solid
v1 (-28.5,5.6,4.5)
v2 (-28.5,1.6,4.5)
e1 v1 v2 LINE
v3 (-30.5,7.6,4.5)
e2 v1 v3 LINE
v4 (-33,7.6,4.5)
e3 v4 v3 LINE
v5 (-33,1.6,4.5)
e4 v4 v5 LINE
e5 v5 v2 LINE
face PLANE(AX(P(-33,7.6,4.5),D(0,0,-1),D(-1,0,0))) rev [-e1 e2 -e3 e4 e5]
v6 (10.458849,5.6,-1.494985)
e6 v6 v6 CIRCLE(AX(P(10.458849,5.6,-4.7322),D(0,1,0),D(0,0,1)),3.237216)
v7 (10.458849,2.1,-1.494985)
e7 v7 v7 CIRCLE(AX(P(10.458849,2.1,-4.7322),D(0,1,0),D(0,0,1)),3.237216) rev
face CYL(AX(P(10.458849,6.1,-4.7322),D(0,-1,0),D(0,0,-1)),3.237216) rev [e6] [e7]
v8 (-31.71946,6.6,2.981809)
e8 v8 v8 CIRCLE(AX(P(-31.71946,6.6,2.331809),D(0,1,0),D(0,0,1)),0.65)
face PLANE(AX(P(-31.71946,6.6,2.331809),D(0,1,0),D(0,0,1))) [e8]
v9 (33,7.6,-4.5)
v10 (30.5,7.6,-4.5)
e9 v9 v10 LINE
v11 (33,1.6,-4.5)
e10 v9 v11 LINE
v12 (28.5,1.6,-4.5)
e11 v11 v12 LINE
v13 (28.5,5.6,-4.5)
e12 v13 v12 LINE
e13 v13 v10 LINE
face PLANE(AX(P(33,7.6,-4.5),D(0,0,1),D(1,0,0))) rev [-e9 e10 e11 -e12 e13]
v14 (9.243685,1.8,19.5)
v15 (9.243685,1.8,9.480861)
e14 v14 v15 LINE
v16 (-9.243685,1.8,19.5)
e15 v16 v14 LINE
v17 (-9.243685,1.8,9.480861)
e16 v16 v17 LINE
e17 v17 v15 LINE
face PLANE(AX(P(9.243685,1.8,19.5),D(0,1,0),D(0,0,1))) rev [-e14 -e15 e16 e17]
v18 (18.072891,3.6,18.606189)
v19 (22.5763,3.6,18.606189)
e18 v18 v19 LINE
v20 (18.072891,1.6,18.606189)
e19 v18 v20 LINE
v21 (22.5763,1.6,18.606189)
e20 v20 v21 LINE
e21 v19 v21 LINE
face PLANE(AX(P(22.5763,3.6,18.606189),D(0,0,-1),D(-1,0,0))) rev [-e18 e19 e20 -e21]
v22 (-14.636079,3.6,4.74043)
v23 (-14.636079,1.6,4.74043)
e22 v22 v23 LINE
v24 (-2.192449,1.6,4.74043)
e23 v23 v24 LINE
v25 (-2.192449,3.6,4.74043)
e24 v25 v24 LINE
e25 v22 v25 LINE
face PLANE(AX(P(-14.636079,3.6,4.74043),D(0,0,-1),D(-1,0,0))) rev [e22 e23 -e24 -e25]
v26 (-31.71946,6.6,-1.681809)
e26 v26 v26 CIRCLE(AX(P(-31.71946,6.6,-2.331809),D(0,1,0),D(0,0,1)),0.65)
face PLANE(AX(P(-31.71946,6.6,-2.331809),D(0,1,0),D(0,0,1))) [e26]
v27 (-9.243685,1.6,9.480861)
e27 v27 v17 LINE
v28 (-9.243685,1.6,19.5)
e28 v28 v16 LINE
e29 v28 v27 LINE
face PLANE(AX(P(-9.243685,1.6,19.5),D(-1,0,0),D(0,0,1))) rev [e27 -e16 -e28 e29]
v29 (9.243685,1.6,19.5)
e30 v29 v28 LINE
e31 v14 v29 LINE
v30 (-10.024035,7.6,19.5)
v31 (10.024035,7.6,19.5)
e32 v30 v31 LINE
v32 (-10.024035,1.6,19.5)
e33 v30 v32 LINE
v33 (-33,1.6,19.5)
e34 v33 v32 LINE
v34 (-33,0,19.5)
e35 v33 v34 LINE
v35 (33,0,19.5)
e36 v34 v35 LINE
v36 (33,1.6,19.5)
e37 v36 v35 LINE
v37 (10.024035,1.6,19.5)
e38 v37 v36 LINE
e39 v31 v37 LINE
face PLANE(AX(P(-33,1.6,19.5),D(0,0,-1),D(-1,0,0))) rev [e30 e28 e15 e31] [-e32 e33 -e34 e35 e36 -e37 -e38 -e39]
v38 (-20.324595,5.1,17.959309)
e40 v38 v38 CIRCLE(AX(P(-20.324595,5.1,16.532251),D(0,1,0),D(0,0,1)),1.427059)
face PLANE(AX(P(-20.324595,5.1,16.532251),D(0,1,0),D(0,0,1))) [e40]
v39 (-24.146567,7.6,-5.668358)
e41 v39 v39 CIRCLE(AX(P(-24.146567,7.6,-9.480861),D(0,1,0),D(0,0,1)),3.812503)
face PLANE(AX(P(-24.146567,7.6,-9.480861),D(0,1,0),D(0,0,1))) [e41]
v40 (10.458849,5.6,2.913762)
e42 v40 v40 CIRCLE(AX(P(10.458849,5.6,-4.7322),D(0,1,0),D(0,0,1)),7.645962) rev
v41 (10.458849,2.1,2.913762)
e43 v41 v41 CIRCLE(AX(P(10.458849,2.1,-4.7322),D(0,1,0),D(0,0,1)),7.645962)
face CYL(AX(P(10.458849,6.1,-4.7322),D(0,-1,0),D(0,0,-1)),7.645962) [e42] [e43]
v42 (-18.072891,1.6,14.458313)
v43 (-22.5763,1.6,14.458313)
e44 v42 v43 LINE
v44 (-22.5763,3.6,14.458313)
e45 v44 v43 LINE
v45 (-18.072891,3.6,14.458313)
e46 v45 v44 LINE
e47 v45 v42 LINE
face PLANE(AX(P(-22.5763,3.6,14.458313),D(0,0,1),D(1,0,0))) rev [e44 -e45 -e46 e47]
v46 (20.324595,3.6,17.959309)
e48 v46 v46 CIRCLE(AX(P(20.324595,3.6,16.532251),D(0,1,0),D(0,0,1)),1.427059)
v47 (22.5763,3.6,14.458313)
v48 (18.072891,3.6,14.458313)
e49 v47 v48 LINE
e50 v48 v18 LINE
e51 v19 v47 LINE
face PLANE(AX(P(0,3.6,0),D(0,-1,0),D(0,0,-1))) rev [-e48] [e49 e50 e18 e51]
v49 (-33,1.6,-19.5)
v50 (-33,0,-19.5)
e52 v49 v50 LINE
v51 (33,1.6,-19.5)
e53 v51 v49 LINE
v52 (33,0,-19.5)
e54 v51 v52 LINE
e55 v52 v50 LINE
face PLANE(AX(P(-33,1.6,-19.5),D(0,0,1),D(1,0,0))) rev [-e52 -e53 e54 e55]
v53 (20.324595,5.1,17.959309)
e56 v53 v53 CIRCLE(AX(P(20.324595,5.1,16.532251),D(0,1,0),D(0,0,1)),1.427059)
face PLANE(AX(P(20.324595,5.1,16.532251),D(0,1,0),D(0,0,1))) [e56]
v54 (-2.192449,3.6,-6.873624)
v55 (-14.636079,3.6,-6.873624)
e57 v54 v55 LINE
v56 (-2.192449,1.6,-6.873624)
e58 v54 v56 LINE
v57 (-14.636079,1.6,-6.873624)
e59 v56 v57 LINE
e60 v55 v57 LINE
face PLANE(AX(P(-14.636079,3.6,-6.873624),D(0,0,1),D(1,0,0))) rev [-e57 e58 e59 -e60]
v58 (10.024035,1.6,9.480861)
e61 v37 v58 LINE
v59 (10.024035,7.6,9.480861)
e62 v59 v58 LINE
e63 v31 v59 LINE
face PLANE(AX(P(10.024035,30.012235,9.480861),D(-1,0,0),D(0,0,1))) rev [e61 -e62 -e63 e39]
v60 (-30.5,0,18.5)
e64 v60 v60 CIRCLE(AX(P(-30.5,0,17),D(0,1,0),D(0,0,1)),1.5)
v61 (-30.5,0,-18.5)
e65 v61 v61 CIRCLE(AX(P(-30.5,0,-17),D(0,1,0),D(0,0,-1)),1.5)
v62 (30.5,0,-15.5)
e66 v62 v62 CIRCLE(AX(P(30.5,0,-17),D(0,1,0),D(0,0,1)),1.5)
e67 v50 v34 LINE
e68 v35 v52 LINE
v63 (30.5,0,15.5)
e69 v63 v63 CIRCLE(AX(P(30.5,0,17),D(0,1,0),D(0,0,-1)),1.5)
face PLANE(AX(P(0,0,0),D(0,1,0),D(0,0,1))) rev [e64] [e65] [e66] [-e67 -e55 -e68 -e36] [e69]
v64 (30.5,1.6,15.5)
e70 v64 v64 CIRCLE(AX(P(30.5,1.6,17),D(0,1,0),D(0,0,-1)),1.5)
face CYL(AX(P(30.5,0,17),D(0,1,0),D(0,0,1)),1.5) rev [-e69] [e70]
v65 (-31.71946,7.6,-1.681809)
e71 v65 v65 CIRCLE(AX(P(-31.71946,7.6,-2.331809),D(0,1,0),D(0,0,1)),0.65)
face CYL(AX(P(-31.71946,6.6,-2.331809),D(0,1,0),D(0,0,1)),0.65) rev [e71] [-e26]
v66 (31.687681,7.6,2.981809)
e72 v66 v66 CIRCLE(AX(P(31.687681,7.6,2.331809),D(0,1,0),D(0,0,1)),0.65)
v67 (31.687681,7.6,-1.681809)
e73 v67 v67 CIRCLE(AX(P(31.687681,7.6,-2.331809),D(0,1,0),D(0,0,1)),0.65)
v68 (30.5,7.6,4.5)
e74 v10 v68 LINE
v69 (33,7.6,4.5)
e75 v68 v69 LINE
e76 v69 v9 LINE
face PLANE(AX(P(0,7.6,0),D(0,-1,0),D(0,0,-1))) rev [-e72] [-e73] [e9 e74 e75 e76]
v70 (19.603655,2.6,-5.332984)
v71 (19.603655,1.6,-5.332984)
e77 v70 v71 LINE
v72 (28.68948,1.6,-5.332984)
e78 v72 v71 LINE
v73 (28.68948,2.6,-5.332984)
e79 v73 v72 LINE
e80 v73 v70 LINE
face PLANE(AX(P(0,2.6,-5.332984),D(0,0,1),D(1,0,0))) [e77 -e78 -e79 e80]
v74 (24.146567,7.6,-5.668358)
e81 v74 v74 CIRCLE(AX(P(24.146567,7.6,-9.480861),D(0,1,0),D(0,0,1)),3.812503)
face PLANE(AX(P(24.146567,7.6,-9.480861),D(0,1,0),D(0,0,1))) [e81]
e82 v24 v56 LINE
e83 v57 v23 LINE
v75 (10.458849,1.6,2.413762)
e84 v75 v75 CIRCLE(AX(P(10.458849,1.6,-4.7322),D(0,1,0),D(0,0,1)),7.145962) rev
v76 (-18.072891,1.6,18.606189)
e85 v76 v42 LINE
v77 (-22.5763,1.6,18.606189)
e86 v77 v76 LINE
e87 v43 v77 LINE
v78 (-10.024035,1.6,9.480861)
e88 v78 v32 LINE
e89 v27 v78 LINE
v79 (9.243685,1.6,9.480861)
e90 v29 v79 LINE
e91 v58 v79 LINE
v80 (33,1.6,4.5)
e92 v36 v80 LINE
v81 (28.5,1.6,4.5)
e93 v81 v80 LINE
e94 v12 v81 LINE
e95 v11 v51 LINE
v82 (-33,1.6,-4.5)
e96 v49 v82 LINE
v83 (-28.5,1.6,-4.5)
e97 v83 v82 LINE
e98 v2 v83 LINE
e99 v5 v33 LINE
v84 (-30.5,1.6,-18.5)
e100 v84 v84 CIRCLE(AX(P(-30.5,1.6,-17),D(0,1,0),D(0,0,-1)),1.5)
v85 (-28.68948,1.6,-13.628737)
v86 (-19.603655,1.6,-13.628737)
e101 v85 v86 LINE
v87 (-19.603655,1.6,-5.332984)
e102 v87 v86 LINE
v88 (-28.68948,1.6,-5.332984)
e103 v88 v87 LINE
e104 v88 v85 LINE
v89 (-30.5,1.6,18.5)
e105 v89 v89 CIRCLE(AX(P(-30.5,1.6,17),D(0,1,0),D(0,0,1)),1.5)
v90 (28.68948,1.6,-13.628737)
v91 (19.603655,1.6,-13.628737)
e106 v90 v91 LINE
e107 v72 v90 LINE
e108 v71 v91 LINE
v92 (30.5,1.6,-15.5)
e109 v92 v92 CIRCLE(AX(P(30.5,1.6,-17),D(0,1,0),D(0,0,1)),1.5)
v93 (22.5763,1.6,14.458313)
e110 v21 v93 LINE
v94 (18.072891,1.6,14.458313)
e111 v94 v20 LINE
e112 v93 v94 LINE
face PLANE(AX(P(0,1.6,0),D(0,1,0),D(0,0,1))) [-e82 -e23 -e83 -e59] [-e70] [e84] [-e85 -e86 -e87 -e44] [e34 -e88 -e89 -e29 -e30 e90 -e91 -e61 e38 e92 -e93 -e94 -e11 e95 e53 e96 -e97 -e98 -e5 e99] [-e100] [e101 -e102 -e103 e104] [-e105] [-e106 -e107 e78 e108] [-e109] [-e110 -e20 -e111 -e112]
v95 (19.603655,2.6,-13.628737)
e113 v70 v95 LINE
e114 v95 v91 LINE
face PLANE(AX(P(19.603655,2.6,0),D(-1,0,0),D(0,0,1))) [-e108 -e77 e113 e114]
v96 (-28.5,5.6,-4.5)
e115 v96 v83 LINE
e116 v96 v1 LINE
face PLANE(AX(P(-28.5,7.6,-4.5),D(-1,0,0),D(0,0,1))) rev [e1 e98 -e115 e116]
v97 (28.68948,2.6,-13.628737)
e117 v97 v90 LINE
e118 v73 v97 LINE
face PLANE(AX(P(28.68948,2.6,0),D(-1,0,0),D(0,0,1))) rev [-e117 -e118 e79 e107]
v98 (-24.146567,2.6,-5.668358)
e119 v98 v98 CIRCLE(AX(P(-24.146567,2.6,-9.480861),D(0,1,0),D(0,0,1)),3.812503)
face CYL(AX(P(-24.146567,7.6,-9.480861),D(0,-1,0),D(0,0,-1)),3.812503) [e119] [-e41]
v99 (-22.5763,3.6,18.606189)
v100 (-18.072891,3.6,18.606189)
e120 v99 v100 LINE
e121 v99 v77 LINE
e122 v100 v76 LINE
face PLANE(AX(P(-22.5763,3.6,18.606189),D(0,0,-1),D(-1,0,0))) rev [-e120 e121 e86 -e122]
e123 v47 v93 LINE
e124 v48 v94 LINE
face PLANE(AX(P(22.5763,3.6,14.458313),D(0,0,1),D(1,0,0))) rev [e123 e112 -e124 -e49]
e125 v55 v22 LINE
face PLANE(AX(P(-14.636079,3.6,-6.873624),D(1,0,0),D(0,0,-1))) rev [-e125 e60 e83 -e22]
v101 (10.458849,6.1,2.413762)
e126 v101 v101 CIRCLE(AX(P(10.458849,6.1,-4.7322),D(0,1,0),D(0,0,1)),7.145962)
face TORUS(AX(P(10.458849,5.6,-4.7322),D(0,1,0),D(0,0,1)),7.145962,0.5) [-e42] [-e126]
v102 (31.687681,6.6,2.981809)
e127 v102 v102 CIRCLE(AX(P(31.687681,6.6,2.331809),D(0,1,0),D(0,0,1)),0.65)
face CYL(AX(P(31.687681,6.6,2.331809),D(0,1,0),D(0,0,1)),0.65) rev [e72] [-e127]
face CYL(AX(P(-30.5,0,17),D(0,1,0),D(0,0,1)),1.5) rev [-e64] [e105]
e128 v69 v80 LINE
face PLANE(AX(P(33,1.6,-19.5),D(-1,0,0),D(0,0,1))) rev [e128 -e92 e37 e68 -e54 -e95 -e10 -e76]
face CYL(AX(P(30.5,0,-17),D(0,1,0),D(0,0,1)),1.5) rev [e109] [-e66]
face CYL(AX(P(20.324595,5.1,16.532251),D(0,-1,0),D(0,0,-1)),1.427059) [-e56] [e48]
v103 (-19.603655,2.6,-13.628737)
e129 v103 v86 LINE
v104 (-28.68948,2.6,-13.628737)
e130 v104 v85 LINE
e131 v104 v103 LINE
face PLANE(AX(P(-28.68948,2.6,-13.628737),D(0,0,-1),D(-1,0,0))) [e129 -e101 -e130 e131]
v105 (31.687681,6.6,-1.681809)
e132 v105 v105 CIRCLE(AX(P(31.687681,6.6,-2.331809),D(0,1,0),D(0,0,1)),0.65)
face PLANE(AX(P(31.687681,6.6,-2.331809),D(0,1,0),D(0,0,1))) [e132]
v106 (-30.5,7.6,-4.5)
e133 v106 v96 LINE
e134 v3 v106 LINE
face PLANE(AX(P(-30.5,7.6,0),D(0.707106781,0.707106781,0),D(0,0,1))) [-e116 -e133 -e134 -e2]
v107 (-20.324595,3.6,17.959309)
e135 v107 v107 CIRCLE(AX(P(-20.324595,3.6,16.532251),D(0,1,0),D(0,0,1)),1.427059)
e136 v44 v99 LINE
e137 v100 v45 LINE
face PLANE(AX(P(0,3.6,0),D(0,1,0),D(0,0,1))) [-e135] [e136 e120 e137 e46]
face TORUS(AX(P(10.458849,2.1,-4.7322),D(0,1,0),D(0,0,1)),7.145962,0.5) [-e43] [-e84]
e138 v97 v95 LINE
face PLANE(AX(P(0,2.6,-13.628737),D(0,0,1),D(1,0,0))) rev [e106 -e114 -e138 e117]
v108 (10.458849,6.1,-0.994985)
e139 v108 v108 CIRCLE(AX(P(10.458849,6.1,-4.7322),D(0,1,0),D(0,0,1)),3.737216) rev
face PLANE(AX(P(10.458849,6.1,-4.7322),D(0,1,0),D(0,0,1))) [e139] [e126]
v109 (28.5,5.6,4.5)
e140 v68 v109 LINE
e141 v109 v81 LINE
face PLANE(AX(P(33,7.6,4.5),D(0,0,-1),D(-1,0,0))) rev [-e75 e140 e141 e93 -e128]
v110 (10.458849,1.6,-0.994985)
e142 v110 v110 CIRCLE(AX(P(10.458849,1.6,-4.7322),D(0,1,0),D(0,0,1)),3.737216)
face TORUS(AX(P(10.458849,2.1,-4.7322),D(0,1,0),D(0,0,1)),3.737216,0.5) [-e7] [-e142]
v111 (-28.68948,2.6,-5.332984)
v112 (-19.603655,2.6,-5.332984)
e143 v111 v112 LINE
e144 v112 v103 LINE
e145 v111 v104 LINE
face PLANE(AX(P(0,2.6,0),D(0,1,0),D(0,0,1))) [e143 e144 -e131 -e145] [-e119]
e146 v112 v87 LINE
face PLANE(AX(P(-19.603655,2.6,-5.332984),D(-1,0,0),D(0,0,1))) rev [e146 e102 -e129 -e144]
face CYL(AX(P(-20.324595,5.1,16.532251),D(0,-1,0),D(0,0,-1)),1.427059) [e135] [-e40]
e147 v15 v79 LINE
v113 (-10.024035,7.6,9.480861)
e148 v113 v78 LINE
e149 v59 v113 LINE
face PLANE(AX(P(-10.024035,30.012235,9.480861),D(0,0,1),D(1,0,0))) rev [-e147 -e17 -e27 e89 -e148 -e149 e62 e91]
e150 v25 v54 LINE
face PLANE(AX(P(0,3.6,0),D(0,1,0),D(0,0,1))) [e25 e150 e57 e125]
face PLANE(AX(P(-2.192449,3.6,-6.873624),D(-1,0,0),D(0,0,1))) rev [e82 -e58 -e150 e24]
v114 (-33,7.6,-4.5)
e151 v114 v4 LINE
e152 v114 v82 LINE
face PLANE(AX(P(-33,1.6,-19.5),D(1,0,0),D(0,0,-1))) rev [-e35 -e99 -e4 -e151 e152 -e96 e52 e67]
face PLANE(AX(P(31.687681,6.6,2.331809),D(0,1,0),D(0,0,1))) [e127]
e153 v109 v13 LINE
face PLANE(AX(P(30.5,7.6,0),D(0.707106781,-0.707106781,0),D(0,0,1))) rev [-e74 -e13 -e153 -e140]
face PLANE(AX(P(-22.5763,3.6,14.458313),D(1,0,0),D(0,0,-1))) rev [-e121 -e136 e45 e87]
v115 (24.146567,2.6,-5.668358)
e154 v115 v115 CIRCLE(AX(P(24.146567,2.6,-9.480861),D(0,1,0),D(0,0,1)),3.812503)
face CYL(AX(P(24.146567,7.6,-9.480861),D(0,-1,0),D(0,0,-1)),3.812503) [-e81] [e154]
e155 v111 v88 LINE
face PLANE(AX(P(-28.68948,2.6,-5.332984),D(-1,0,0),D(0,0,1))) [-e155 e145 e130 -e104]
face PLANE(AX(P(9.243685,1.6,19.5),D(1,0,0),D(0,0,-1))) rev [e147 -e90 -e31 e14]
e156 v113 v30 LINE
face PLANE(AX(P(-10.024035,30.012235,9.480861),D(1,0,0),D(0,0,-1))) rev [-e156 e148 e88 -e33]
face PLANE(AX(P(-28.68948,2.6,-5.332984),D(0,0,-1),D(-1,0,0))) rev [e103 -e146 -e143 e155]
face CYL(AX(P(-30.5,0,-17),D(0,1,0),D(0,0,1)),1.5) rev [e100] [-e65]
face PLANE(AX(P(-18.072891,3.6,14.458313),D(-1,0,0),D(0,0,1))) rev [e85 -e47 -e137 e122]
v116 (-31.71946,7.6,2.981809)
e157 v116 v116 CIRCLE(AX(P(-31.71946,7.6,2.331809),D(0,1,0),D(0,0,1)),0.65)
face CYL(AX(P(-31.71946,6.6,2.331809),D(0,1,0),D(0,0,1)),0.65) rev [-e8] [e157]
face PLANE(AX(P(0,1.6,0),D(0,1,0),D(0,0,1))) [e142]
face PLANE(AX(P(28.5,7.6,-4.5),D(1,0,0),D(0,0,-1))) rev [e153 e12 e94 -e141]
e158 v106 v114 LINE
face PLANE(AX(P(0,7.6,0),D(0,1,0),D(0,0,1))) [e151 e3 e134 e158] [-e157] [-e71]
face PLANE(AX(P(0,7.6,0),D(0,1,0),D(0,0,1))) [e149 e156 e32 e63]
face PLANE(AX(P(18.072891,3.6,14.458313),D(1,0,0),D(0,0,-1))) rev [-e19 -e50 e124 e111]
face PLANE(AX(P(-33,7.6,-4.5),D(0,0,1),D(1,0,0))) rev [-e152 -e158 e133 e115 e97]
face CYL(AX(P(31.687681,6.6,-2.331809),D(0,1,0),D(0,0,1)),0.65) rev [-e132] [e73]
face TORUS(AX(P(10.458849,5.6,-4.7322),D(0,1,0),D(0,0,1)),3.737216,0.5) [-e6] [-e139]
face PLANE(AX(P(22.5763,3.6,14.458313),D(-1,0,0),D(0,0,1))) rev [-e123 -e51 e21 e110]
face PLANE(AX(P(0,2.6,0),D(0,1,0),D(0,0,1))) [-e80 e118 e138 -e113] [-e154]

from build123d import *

# Parameters (mm, degrees)
SKETCH_1_W          = 66
SKETCH_1_H          = 39
EXTRUDE_1_DEPTH     = 1.6
SKETCH_2_R          = 1.5
CUT_EXTRUDE_1_DEPTH = 1.6
SKETCH_3_W          = 4.5
SKETCH_3_H          = 9
EXTRUDE_2_DEPTH     = 6
CHAMFER_1_SIZE      = 2
SKETCH_6_R          = 0.65
CUT_EXTRUDE_2_DEPTH = 1
SKETCH_7_W          = 20.048070128
SKETCH_7_H          = 10.01913925
EXTRUDE_3_DEPTH     = 6
SKETCH_8_W          = 18.487369842
SKETCH_8_H          = 0.2
CUT_EXTRUDE_3_DEPTH = 45.571855355
SKETCH_9_R          = 7.645962027
SKETCH_9_R_2        = 3.237215686
EXTRUDE_4_DEPTH     = 4.5
FILLET_1_R          = 0.5
SKETCH_10_W         = 9.085824886
SKETCH_10_H         = 8.295753157
SKETCH_10_R         = 3.812502592
EXTRUDE_5_DEPTH     = 1
SKETCH_11_R         = 3.812502592
EXTRUDE_6_DEPTH     = 5
SKETCH_12_W         = 12.443629735
SKETCH_12_H         = 11.614054419
EXTRUDE_7_DEPTH     = 2
SKETCH_13_W         = 4.503408857
SKETCH_13_H         = 4.147876578
EXTRUDE_8_DEPTH     = 2
SKETCH_14_R         = 1.427058518
EXTRUDE_9_DEPTH     = 1.5


with BuildPart() as part:
    # 草图1 → 凸台-拉伸1 (new body)
    with BuildSketch(Plane(origin=(0, 0, 0), x_dir=(1, 0, 0), z_dir=(0, 1, 0))):
        Rectangle(SKETCH_1_W, SKETCH_1_H)
    extrude(amount=EXTRUDE_1_DEPTH)

    # 草图2 → 切除-拉伸1 (cut)
    with BuildSketch(Plane(origin=(0, 1.6, 0), x_dir=(1, 0, 0), z_dir=(0, 1, 0))):
        with Locations(Location((-30.5, -17, 0), (0, 0, 270))):
            Circle(SKETCH_2_R)
        with Locations(Location((30.5, -17, 0), (0, 0, 90))):
            Circle(SKETCH_2_R)
        with Locations(Location((30.5, 17, 0), (0, 0, 270))):
            Circle(SKETCH_2_R)
        with Locations(Location((-30.5, 17, 0), (0, 0, 90))):
            Circle(SKETCH_2_R)
    extrude(amount=-CUT_EXTRUDE_1_DEPTH, mode=Mode.SUBTRACT)

    # 草图3 → 凸台-拉伸2 (add)
    with BuildSketch(Plane(origin=(0, 1.6, 0), x_dir=(1, 0, 0), z_dir=(0, 1, 0))):
        with Locations((-30.75, 0)):
            Rectangle(SKETCH_3_W, SKETCH_3_H)
        with Locations((30.75, 0)):
            Rectangle(SKETCH_3_W, SKETCH_3_H)
    extrude(amount=EXTRUDE_2_DEPTH)

    # 倒角1
    chamfer_1_edges = [part.edges().sort_by_distance(p)[0] for p in [
        (-28.5, 7.6, 0),
        (28.5, 7.6, 0),
    ]]
    chamfer(chamfer_1_edges, length=CHAMFER_1_SIZE)

    # 草图6 → 切除-拉伸2 (cut)
    with BuildSketch(Plane(origin=(0, 7.6, 0), x_dir=(1, 0, 0), z_dir=(0, 1, 0))):
        with Locations(Location((-31.719459614, 2.331808923, 0), (0, 0, 270))):
            Circle(SKETCH_6_R)
        with Locations(Location((-31.719459614, -2.331808923, 0), (0, 0, 270))):
            Circle(SKETCH_6_R)
        with Locations(Location((31.687681101, -2.331808923, 0), (0, 0, 270))):
            Circle(SKETCH_6_R)
        with Locations(Location((31.687681101, 2.331808923, 0), (0, 0, 270))):
            Circle(SKETCH_6_R)
    extrude(amount=-CUT_EXTRUDE_2_DEPTH, mode=Mode.SUBTRACT)

    # 草图7 → 凸台-拉伸3 (add)
    with BuildSketch(Plane(origin=(0, 1.6, 0), x_dir=(1, 0, 0), z_dir=(0, 1, 0))):
        with Locations((0, -14.490430375)):
            Rectangle(SKETCH_7_W, SKETCH_7_H)
    extrude(amount=EXTRUDE_3_DEPTH)

    # 草图8 → 切除-拉伸3 (cut, through all)
    with BuildSketch(Plane(origin=(0, 0, 9.48086075), x_dir=(-1, 0, 0), z_dir=(0, 0, -1))):
        with Locations((0, 1.7)):
            Rectangle(SKETCH_8_W, SKETCH_8_H)
    extrude(amount=-CUT_EXTRUDE_3_DEPTH, mode=Mode.SUBTRACT)


with BuildPart() as body_2:
    # 草图9 → 凸台-拉伸4 (new body)
    with BuildSketch(Plane(origin=(0, 1.6, 0), x_dir=(1, 0, 0), z_dir=(0, 1, 0))):
        with Locations(Location((10.458848846, 4.732200461, 0), (0, 0, 270))):
            Circle(SKETCH_9_R)
        with Locations(Location((10.458848846, 4.732200461, 0), (0, 0, 270))):
            Circle(SKETCH_9_R_2, mode=Mode.SUBTRACT)
    extrude(amount=EXTRUDE_4_DEPTH)

    # 圆角1
    fillet_1_edges = [body_2.edges().sort_by_distance(p)[0] for p in [
        (10.458848846, 1.6, -12.378162489),
        (10.458848846, 6.1, -12.378162489),
        (10.458848846, 1.6, -7.969416147),
        (10.458848846, 6.1, -7.969416147),
    ]]
    fillet(fillet_1_edges, radius=FILLET_1_R)


with BuildPart() as part_1:
    add(part.part)

    # 相交1: read off the stored shape, not the designer's step
    # 相交1: union body 2
    add(body_2.part)

    # 草图10 → 凸台-拉伸5 (add)
    # profile 1 of 3: a face of its own
    with BuildSketch(Plane(origin=(0, 1.6, 0), x_dir=(1, 0, 0), z_dir=(0, 1, 0))):
        with Locations((24.146567223, 9.480860751)):
            Rectangle(SKETCH_10_W, SKETCH_10_H)
        with Locations((24.146567223, 9.48086075)):
            Circle(SKETCH_10_R, mode=Mode.SUBTRACT)
    # profile 2 of 3: a face of its own
    with BuildSketch(Plane(origin=(0, 1.6, 0), x_dir=(1, 0, 0), z_dir=(0, 1, 0))):
        with Locations((24.146567223, 9.48086075)):
            Circle(SKETCH_10_R)
    # profile 3 of 3: a face of its own
    with BuildSketch(Plane(origin=(0, 1.6, 0), x_dir=(1, 0, 0), z_dir=(0, 1, 0))):
        with Locations((-24.146567223, 9.480860751)):
            Rectangle(SKETCH_10_W, SKETCH_10_H)
    extrude(amount=EXTRUDE_5_DEPTH)

    # 草图11 → 凸台-拉伸6 (add)
    with BuildSketch(Plane(origin=(0, 2.6, 0), x_dir=(1, 0, 0), z_dir=(0, 1, 0))):
        with Locations(Location((-24.146567223, 9.48086075, 0), (0, 0, 270))):
            Circle(SKETCH_11_R)
        with Locations(Location((24.146567223, 9.48086075, 0), (0, 0, 270))):
            Circle(SKETCH_11_R)
    extrude(amount=EXTRUDE_6_DEPTH)

    # 草图12 → 凸台-拉伸7 (add)
    with BuildSketch(Plane(origin=(0, 1.6, 0), x_dir=(1, 0, 0), z_dir=(0, 1, 0))):
        with Locations((-8.414263916, 1.066596835)):
            Rectangle(SKETCH_12_W, SKETCH_12_H)
    extrude(amount=EXTRUDE_7_DEPTH)

    # 草图13 → 凸台-拉伸8 (add)
    with BuildSketch(Plane(origin=(0, 1.6, 0), x_dir=(1, 0, 0), z_dir=(0, 1, 0))):
        with Locations((-20.324595233, -16.532250933)):
            Rectangle(SKETCH_13_W, SKETCH_13_H)
        with Locations((20.324595233, -16.532250933)):
            Rectangle(SKETCH_13_W, SKETCH_13_H)
    extrude(amount=EXTRUDE_8_DEPTH)

    # 草图14 → 凸台-拉伸9 (add)
    with BuildSketch(Plane(origin=(0, 3.6, 0), x_dir=(1, 0, 0), z_dir=(0, 1, 0))):
        with Locations(Location((-20.324595233, -16.532250933, 0), (0, 0, 270))):
            Circle(SKETCH_14_R)
        with Locations(Location((20.324595233, -16.532250933, 0), (0, 0, 270))):
            Circle(SKETCH_14_R)
    extrude(amount=EXTRUDE_9_DEPTH)


solid = part_1.part
